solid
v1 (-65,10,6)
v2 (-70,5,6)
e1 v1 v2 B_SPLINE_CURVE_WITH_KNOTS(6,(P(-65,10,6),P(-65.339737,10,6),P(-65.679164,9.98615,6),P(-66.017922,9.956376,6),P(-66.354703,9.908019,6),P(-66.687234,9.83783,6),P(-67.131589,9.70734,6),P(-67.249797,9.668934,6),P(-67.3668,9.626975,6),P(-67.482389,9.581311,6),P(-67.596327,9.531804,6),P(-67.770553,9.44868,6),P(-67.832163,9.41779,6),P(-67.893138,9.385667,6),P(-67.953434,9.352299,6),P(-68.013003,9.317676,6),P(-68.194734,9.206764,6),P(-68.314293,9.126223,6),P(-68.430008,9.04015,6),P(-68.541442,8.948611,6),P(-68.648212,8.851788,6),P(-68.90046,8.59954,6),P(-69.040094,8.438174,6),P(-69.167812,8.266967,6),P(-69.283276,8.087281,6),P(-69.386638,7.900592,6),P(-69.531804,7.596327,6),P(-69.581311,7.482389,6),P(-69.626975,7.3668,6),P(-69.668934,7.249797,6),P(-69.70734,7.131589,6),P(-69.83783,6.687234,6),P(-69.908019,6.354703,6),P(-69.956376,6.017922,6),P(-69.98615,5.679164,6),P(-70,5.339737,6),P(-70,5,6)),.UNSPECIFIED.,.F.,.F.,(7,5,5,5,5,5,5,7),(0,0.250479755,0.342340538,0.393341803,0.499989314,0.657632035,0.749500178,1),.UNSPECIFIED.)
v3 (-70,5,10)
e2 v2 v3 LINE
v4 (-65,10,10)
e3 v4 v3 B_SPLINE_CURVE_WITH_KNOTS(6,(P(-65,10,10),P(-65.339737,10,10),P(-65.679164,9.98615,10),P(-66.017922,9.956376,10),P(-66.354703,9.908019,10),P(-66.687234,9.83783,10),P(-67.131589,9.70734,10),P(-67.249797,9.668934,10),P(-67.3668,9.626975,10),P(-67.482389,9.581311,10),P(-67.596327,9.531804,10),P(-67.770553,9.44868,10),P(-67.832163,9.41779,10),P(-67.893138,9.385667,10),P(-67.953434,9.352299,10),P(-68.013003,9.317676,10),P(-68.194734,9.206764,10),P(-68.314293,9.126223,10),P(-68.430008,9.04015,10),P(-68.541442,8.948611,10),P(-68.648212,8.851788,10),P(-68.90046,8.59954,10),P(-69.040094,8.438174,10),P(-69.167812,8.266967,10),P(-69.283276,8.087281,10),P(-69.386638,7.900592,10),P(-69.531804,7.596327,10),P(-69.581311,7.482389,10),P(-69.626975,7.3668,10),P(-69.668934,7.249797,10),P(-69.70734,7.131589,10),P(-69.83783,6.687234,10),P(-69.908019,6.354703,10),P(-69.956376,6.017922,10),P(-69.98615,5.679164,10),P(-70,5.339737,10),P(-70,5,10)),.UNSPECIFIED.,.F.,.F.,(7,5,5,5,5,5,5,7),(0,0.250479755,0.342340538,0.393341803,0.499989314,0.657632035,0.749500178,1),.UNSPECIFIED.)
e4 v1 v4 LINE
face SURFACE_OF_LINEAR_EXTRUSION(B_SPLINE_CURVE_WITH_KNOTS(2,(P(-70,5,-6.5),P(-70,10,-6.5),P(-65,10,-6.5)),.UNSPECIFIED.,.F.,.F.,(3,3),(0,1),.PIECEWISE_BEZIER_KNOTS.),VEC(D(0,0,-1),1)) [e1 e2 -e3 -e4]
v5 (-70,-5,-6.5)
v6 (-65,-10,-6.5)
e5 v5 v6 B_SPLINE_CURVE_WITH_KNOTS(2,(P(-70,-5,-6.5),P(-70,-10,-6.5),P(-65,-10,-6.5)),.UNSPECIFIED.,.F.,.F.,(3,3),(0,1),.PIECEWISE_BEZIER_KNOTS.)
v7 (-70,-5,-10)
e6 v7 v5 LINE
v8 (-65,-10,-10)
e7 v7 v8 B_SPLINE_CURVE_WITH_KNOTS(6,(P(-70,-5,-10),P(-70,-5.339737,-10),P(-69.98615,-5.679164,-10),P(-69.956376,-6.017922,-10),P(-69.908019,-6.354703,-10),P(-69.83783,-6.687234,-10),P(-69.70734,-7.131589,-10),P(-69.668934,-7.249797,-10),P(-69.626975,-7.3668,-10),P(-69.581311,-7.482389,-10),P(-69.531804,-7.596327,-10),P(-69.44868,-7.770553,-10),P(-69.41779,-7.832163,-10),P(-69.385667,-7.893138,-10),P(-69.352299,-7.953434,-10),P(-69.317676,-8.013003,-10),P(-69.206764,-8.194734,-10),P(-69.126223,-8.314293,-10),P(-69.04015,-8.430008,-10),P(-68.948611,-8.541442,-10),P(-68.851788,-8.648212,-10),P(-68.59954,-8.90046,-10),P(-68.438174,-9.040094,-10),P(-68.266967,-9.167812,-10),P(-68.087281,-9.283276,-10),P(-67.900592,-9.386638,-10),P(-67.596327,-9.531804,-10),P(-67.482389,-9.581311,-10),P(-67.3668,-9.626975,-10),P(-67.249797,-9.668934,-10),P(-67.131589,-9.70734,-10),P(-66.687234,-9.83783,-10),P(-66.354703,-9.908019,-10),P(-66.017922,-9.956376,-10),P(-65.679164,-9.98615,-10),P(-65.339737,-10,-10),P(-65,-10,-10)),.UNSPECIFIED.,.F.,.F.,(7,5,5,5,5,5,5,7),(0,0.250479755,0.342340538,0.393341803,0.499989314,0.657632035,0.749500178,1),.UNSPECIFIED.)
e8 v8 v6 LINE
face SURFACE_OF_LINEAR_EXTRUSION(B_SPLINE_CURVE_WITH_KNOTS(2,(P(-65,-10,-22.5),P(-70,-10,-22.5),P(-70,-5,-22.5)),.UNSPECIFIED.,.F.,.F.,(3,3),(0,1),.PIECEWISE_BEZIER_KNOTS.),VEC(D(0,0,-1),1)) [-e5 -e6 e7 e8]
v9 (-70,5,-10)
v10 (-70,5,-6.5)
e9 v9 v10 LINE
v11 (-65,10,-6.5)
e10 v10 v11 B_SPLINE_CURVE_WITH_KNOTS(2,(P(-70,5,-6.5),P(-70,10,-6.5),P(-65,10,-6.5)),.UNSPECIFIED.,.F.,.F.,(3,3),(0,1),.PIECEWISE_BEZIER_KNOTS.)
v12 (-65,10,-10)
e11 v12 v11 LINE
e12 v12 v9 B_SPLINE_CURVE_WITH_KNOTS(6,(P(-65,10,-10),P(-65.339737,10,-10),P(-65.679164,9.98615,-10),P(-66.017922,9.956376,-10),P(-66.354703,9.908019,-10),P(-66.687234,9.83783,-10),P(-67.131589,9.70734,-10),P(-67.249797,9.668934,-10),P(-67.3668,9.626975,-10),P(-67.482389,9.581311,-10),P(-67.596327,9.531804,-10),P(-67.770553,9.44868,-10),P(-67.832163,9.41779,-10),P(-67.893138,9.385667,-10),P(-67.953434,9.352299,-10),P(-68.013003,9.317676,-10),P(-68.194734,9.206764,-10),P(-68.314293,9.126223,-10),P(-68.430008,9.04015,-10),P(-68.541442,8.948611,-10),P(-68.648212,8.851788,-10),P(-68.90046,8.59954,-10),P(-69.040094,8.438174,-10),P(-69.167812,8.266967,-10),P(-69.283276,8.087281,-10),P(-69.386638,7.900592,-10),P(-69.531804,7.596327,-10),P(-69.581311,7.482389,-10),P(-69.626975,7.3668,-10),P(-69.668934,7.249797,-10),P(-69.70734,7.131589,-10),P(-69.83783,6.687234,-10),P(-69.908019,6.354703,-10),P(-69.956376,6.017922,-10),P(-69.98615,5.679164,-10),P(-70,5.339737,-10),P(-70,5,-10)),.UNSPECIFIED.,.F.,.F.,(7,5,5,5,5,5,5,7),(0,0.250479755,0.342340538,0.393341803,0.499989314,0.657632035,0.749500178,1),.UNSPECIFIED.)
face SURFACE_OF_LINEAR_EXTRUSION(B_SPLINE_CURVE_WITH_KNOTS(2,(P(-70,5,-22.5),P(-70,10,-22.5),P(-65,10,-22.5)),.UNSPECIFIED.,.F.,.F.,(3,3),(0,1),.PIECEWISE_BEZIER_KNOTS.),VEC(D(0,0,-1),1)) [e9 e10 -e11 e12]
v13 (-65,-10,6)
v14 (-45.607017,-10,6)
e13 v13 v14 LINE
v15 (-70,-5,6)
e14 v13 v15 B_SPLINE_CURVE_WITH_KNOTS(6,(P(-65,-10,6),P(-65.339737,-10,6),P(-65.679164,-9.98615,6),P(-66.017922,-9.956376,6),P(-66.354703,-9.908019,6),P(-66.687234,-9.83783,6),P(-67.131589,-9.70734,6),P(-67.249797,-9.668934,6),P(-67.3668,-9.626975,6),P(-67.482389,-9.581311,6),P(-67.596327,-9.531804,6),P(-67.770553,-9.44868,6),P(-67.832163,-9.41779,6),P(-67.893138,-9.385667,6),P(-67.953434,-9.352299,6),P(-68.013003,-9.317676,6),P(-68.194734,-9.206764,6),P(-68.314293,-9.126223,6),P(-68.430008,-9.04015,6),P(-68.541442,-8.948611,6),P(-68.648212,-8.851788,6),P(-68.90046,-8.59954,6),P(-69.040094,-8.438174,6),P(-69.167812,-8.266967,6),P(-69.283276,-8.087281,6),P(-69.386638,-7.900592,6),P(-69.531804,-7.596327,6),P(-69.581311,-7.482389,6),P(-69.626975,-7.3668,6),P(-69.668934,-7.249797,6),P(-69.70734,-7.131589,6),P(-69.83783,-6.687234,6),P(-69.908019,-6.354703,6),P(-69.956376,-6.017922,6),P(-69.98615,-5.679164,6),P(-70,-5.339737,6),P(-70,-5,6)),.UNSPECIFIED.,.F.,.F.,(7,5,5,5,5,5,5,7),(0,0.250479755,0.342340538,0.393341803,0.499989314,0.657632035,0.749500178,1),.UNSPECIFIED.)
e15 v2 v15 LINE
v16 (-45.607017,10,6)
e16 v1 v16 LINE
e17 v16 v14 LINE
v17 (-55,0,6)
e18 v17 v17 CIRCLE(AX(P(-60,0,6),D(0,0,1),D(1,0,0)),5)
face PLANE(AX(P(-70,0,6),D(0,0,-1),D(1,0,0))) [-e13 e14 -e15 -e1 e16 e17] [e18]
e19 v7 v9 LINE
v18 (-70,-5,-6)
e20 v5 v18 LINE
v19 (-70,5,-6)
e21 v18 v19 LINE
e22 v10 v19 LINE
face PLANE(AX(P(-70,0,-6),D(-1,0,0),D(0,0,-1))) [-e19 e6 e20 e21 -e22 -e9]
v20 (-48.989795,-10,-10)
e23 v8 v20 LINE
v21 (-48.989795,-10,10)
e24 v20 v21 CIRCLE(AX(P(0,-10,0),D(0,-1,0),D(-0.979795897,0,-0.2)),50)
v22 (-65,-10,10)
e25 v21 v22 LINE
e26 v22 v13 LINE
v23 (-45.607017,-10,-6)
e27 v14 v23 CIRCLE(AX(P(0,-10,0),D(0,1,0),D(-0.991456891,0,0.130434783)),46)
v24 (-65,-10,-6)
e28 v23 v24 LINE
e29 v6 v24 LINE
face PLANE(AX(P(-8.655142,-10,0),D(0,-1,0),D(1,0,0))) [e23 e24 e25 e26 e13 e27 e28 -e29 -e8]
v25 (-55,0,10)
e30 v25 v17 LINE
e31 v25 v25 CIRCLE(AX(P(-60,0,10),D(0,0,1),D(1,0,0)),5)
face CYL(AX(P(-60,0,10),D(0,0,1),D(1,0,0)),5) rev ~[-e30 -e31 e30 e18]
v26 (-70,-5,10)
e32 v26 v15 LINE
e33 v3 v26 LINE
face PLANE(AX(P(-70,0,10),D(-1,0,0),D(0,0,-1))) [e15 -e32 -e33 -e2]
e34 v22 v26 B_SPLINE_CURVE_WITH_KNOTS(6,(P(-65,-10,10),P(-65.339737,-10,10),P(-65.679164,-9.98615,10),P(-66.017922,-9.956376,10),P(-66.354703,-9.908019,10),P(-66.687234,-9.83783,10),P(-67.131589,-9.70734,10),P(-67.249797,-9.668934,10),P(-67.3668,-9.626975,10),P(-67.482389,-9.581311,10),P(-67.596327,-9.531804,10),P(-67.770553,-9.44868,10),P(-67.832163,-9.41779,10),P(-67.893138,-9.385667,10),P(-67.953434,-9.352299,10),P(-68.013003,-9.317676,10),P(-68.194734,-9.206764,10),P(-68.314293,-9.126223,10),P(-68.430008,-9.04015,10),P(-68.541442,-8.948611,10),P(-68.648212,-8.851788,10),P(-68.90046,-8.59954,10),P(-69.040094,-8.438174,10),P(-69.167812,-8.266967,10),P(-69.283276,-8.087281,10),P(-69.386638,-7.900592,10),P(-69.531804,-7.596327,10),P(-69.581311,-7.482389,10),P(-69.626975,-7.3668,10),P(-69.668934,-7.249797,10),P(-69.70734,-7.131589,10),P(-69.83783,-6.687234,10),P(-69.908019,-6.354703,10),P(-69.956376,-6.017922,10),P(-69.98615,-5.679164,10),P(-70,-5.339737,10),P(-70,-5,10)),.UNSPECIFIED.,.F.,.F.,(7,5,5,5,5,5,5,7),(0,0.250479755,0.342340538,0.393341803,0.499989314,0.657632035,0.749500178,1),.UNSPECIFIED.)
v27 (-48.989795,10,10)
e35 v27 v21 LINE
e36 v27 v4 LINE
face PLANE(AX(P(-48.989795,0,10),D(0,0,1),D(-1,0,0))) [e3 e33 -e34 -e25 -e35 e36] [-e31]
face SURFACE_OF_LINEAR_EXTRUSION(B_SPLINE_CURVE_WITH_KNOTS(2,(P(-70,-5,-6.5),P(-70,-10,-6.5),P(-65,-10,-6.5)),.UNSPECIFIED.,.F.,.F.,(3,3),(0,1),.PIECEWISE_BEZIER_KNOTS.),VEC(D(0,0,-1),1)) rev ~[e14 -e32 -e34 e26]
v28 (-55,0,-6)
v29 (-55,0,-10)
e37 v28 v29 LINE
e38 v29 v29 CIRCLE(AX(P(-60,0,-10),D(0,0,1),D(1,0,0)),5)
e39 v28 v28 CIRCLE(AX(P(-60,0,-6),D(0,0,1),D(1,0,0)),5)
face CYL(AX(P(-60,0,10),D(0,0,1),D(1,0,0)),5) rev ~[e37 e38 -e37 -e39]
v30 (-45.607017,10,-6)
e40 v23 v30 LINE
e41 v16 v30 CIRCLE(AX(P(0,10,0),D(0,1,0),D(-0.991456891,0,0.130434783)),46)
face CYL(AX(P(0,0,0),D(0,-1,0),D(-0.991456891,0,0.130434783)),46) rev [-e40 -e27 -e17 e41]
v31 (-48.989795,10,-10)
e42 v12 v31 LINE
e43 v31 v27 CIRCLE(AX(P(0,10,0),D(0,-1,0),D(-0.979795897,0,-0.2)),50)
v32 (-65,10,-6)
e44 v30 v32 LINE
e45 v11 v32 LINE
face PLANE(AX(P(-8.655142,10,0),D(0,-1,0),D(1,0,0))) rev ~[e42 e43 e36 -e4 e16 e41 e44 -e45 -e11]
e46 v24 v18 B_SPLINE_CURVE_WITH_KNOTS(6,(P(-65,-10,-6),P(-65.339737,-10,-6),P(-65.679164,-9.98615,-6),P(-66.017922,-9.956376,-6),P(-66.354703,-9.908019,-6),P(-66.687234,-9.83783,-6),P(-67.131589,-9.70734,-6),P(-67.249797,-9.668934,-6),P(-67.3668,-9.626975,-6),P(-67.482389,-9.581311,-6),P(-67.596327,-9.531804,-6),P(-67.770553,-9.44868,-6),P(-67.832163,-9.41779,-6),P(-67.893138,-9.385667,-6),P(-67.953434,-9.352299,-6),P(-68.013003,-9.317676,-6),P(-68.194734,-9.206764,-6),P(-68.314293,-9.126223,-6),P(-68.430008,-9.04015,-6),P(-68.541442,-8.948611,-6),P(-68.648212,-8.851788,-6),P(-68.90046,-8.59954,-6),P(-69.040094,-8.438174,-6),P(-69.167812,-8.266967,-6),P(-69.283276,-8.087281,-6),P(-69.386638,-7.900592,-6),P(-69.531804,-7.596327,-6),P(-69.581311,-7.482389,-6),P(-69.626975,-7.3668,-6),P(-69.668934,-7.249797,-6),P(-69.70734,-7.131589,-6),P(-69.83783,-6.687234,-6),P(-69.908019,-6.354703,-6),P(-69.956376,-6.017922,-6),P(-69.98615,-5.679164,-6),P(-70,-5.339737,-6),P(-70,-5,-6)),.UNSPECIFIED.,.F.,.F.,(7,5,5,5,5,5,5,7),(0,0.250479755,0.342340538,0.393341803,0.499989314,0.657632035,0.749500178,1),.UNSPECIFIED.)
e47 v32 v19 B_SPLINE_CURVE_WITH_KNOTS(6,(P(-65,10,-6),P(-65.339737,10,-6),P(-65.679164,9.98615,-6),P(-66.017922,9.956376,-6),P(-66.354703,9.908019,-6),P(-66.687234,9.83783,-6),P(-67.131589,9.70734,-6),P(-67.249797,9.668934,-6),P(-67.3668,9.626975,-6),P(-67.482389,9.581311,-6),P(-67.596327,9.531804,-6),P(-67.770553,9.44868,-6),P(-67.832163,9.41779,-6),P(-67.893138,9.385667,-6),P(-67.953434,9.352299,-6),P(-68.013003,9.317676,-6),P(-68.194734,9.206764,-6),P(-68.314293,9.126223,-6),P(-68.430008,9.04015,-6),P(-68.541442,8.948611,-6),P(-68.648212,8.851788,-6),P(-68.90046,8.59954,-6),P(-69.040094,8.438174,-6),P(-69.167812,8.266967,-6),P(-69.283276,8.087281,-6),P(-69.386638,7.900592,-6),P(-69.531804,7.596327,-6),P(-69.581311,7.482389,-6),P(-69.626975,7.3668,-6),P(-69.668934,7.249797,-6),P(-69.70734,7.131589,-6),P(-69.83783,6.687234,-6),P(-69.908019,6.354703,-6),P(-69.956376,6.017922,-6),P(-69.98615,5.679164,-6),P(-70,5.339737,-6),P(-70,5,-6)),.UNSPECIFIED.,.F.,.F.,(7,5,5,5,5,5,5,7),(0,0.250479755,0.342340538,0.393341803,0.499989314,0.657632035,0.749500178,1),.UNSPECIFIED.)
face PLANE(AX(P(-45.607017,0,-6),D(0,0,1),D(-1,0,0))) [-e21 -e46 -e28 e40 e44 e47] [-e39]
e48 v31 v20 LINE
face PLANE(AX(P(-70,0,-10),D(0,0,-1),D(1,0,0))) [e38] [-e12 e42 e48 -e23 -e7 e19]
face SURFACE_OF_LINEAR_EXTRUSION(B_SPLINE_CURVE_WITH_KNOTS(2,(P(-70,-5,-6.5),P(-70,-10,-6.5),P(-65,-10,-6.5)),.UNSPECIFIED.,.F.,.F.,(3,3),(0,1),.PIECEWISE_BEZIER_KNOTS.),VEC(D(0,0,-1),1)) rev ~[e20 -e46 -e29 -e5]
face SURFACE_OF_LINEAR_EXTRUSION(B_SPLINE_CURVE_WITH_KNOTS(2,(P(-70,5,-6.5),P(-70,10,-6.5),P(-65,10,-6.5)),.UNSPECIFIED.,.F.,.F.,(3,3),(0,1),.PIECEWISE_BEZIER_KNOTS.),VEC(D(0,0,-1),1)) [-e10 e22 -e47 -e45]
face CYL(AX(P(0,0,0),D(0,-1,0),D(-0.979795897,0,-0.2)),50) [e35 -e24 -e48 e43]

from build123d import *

# Parameters (mm, degrees)
F1_DEPTH    = 10
F2_T1_DEPTH = 29
F2_T3_DEPTH = 29
F3_R        = 5
F4_DEPTH    = 25.4


# Not quite as in the source:
# - a fillet or chamfer that OpenCascade refuses, or shapes differently, is made with other operations: its cross-section is extruded or revolved along the edge and cut away or added


with BuildPart() as f1:
    # F0 (on Front) → F1 (new body, symmetric)
    with BuildSketch(Plane.XZ):
        with BuildLine():
            Line((-70, -10), (-48.9897948557, -10))
            ThreePointArc((-48.9897948557, -10), (50, 0), (-48.9897948557, 10))
            Line((-48.9897948557, 10), (-70, 10))
            Line((-70, 10), (-70, 6))
            Line((-70, 6), (-45.607017004, 6))
            ThreePointArc((-45.607017004, 6), (46, 0), (-45.607017004, -6))
            Line((-45.607017004, -6), (-70, -6))
            Line((-70, -6), (-70, -10))
        make_face()
    extrude(amount=F1_DEPTH, both=True)

    # F2: fillet of radius 5 on 4 edges, made by hand

    # F2_s2 → F2_t1 (cut)
    with BuildSketch(Plane.XY.offset(-6.5)):
        with BuildLine():
            add(Edge.make_bspline(
                [(-70, 5), (-70, 10), (-65, 10)],
                knots=[0, 0, 0, 1, 1, 1], degree=2, weights=[1, 1, 1]))
            Line((-65, 10), (-70, 10))
            Line((-70, 10), (-70, 5))
        make_face()
        with BuildLine():
            add(Edge.make_bspline(
                [(-70, -5), (-70, -10), (-65, -10)],
                knots=[0, 0, 0, 1, 1, 1], degree=2, weights=[1, 1, 1]))
            Line((-65, -10), (-70, -10))
            Line((-70, -10), (-70, -5))
        make_face()
    extrude(amount=F2_T1_DEPTH, mode=Mode.SUBTRACT)

    # F2_s4 → F2_t3 (cut)
    with BuildSketch(Plane.XY.offset(-22.5)):
        with BuildLine():
            add(Edge.make_bspline(
                [(-70, 5), (-70, 10), (-65, 10)],
                knots=[0, 0, 0, 1, 1, 1], degree=2, weights=[1, 1, 1]))
            Line((-65, 10), (-70, 10))
            Line((-70, 10), (-70, 5))
        make_face()
        with BuildLine():
            add(Edge.make_bspline(
                [(-65, -10), (-70, -10), (-70, -5)],
                knots=[0, 0, 0, 1, 1, 1], degree=2, weights=[1, 1, 1]))
            Line((-70, -5), (-70, -10))
            Line((-70, -10), (-65, -10))
        make_face()
    extrude(amount=F2_T3_DEPTH, mode=Mode.SUBTRACT)

    # F3 (on face) → F4 (cut)
    with BuildSketch(Plane.XY.offset(10)):
        with Locations((-60, 0)):
            Circle(F3_R)
    extrude(amount=-F4_DEPTH, mode=Mode.SUBTRACT)


solid = f1.part
